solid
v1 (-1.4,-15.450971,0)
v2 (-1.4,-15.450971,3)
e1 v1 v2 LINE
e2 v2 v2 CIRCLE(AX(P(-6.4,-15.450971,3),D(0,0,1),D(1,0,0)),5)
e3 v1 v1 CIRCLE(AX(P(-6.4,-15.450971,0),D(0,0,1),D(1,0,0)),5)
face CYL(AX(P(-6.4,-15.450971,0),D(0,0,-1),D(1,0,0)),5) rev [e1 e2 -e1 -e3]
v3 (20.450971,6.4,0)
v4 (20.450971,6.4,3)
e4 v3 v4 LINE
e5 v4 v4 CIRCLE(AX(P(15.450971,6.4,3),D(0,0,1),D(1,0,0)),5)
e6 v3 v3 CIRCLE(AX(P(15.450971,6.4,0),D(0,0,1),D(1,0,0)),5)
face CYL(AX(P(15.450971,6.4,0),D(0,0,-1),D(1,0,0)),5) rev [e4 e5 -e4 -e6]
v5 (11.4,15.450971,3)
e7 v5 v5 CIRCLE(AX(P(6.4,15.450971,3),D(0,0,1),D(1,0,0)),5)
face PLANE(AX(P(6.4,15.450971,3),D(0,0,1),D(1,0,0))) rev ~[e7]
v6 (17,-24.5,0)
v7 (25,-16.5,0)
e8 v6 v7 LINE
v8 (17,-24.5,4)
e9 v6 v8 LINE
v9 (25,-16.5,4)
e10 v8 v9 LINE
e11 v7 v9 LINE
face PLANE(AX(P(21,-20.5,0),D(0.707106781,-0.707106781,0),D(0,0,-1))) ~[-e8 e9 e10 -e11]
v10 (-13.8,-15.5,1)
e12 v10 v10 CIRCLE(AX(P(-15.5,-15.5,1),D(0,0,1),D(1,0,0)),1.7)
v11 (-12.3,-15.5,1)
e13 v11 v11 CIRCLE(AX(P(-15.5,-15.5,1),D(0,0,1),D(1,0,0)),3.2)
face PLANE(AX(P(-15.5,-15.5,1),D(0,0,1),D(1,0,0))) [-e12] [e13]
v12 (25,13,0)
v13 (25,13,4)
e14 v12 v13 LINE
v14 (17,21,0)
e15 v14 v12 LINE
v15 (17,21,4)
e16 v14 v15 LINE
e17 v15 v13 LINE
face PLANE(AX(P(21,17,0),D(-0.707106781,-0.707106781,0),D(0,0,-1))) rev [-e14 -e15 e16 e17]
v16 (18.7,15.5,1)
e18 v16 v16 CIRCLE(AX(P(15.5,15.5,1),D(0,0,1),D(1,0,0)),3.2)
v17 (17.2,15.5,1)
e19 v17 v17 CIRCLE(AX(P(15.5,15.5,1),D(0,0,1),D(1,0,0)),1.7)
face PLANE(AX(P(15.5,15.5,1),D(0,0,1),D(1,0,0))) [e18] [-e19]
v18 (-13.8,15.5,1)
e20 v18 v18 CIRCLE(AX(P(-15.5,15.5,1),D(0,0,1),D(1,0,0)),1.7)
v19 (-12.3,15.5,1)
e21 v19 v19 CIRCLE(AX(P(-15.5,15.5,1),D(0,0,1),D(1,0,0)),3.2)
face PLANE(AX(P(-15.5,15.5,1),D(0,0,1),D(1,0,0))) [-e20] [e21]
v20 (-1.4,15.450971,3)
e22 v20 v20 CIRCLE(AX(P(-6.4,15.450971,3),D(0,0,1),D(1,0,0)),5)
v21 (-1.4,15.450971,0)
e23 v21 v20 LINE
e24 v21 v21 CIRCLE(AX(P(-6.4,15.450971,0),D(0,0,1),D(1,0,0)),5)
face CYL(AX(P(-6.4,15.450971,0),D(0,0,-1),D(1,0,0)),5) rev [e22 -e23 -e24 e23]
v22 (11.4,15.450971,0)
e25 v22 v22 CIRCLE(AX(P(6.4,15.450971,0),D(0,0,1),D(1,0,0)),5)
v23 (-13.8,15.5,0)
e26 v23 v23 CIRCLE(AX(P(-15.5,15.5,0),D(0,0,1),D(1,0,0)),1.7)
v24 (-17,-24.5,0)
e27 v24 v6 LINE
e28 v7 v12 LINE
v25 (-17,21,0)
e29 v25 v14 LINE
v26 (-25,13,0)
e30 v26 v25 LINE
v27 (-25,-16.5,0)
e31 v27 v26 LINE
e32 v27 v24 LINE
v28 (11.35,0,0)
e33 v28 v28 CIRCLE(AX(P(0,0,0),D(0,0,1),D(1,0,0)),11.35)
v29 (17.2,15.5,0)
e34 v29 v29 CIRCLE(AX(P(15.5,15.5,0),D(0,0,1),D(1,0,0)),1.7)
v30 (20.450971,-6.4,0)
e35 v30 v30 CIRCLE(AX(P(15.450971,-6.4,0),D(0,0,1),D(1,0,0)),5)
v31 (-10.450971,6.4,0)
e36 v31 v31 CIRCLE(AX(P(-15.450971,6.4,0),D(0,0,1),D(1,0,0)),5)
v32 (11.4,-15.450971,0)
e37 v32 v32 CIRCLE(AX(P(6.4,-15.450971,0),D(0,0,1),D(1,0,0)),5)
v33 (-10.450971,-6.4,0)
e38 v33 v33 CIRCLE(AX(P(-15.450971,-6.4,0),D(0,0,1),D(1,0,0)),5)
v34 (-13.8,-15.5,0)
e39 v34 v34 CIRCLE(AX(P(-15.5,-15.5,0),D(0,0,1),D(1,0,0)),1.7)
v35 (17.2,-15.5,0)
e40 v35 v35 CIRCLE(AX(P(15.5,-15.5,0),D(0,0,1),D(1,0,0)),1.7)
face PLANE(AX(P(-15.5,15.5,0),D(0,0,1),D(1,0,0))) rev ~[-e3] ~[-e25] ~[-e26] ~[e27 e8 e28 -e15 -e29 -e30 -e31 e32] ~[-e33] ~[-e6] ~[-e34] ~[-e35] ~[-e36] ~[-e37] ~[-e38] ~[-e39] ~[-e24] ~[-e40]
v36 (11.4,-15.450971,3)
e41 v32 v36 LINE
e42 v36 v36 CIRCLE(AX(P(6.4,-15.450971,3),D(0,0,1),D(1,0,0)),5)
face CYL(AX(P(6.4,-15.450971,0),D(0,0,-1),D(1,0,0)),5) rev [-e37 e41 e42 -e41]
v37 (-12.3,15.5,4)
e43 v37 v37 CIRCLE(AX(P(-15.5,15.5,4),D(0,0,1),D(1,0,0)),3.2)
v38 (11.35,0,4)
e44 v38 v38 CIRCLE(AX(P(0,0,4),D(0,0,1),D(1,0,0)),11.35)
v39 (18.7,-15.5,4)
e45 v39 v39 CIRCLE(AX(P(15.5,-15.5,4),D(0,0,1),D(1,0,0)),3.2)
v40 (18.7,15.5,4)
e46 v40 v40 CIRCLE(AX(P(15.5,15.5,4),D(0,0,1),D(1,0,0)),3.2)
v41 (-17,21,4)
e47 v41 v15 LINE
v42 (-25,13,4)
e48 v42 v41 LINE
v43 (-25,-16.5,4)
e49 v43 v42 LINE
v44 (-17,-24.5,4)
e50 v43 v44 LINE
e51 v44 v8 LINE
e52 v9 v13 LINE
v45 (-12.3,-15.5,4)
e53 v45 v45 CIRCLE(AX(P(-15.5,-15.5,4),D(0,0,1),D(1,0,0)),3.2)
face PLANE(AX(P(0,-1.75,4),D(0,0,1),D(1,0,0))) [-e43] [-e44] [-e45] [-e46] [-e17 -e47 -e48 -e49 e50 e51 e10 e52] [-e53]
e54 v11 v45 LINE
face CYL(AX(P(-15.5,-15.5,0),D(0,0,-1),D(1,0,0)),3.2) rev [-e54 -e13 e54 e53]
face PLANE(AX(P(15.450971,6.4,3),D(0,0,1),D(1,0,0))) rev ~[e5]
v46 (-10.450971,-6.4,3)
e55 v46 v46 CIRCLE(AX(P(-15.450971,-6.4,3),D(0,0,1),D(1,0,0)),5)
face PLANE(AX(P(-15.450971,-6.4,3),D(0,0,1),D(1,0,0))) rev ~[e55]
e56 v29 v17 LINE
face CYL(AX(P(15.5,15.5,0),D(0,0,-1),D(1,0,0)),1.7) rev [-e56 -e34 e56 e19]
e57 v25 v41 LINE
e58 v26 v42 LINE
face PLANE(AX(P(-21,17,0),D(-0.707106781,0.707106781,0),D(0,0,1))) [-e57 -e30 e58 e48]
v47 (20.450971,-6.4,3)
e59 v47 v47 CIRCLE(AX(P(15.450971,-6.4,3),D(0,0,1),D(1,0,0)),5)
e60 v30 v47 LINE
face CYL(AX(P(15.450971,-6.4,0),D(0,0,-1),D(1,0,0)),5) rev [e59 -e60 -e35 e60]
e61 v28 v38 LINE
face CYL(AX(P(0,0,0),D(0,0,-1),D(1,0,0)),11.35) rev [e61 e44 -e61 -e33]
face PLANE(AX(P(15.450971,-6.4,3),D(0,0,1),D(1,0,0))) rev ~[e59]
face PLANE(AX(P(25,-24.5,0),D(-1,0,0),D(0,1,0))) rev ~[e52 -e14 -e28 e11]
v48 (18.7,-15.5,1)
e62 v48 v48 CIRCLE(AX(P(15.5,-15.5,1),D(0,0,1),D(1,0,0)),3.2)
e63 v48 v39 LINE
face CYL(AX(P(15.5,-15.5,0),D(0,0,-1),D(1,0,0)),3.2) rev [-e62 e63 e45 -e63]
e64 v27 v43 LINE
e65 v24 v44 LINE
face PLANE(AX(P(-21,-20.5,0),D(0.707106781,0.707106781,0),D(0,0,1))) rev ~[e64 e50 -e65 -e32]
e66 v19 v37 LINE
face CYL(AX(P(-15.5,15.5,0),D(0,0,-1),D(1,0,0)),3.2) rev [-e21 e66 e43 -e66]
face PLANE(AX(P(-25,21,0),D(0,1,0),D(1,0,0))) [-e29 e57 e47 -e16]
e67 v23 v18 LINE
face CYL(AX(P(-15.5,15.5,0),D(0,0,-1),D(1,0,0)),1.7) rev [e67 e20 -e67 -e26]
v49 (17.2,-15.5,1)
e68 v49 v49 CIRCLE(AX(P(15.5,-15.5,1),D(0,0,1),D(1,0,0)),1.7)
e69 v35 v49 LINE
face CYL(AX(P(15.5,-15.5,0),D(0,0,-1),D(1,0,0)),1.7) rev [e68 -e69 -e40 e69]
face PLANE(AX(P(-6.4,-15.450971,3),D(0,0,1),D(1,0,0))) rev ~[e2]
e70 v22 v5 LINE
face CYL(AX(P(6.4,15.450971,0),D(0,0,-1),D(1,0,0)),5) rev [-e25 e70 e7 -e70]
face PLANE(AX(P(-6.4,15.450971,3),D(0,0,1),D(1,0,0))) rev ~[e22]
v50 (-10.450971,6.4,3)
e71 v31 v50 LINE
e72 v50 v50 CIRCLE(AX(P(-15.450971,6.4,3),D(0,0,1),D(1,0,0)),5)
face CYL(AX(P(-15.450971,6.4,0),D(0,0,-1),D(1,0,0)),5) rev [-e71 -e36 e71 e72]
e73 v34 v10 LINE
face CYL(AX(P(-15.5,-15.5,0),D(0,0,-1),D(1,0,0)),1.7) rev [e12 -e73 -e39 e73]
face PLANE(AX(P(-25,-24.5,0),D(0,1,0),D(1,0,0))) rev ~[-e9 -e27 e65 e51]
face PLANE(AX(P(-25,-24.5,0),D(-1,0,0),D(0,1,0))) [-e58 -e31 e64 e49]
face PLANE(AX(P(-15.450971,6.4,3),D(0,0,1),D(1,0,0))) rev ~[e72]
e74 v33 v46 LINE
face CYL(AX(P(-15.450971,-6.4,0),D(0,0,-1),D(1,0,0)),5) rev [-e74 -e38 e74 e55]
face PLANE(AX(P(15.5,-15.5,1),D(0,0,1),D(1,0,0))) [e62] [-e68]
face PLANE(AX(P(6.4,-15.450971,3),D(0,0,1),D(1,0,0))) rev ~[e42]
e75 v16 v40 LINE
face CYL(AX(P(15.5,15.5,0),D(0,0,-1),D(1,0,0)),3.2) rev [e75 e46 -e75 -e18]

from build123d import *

# Parameters (mm, degrees)
F0_W     = 50
F0_H     = 45.5
F0_R     = 3.2
F0_R_2   = 5
F0_R_3   = 11.35
F1_DEPTH = 4
F0_R_4   = 1.7
F2_DEPTH = 1
F3_DEPTH = 3
F4_SIZE  = 8


# Not quite as in the source:
# - a feature names something its author has since deleted; it is built from what else it names


with BuildPart() as f1:
    # F0 (on Top) → F1 (new body)
    with BuildSketch(Plane.XY):
        with Locations((0, -1.75)):
            Rectangle(F0_W, F0_H)
        with Locations((-15.5, -15.5)):
            Circle(F0_R, mode=Mode.SUBTRACT)
        with Locations((-6.4, -15.4509711824)):
            Circle(F0_R_2, mode=Mode.SUBTRACT)
        with Locations((-15.4509711824, -6.4)):
            Circle(F0_R_2, mode=Mode.SUBTRACT)
        with Locations((6.4, -15.4509711824)):
            Circle(F0_R_2, mode=Mode.SUBTRACT)
        with Locations((15.5, -15.5)):
            Circle(F0_R, mode=Mode.SUBTRACT)
        with Locations((15.4509711824, -6.4)):
            Circle(F0_R_2, mode=Mode.SUBTRACT)
        with Locations((-15.4509711824, 6.4)):
            Circle(F0_R_2, mode=Mode.SUBTRACT)
        with Locations((-15.5, 15.5)):
            Circle(F0_R, mode=Mode.SUBTRACT)
        with Locations((-6.4, 15.4509711824)):
            Circle(F0_R_2, mode=Mode.SUBTRACT)
        Circle(F0_R_3, mode=Mode.SUBTRACT)
        with Locations((15.4509711824, 6.4)):
            Circle(F0_R_2, mode=Mode.SUBTRACT)
        with Locations((6.4, 15.4509711824)):
            Circle(F0_R_2, mode=Mode.SUBTRACT)
        with Locations((15.5, 15.5)):
            Circle(F0_R, mode=Mode.SUBTRACT)
        with Locations((-15.4509711824, -6.4)):
            Circle(F0_R_2)
        with Locations((-6.4, -15.4509711824)):
            Circle(F0_R_2)
        with Locations((6.4, -15.4509711824)):
            Circle(F0_R_2)
        with Locations((15.4509711824, -6.4)):
            Circle(F0_R_2)
        with Locations((15.4509711824, 6.4)):
            Circle(F0_R_2)
        with Locations((6.4, 15.4509711824)):
            Circle(F0_R_2)
        with Locations((-6.4, 15.4509711824)):
            Circle(F0_R_2)
        with Locations((-15.4509711824, 6.4)):
            Circle(F0_R_2)
    extrude(amount=F1_DEPTH)

    # F0 (on Top) → F2 (join)
    with BuildSketch(Plane.XY):
        with Locations((-15.5, 15.5)):
            Circle(F0_R)
        with Locations((-15.5, 15.5)):
            Circle(F0_R_4, mode=Mode.SUBTRACT)
        with Locations((15.5, 15.5)):
            Circle(F0_R)
        with Locations((15.5, 15.5)):
            Circle(F0_R_4, mode=Mode.SUBTRACT)
        with Locations((15.5, -15.5)):
            Circle(F0_R)
        with Locations((15.5, -15.5)):
            Circle(F0_R_4, mode=Mode.SUBTRACT)
        with Locations((-15.5, -15.5)):
            Circle(F0_R)
        with Locations((-15.5, -15.5)):
            Circle(F0_R_4, mode=Mode.SUBTRACT)
    extrude(amount=F2_DEPTH)

    # F0 (on Top) → F3 (cut)
    with BuildSketch(Plane.XY):
        with Locations((-15.4509711824, -6.4)):
            Circle(F0_R_2)
        with Locations((-6.4, -15.4509711824)):
            Circle(F0_R_2)
        with Locations((6.4, -15.4509711824)):
            Circle(F0_R_2)
        with Locations((15.4509711824, -6.4)):
            Circle(F0_R_2)
        with Locations((15.4509711824, 6.4)):
            Circle(F0_R_2)
        with Locations((6.4, 15.4509711824)):
            Circle(F0_R_2)
        with Locations((-6.4, 15.4509711824)):
            Circle(F0_R_2)
        with Locations((-15.4509711824, 6.4)):
            Circle(F0_R_2)
    extrude(amount=F3_DEPTH, mode=Mode.SUBTRACT)

    # F4
    f4_edges = [f1.edges().sort_by_distance(p)[0] for p in [
        (25, 21, 2),
        (-25, 21, 2),
        (25, -24.5, 2),
        (-25, -24.5, 2),
    ]]
    chamfer(f4_edges, length=F4_SIZE)


solid = f1.part
